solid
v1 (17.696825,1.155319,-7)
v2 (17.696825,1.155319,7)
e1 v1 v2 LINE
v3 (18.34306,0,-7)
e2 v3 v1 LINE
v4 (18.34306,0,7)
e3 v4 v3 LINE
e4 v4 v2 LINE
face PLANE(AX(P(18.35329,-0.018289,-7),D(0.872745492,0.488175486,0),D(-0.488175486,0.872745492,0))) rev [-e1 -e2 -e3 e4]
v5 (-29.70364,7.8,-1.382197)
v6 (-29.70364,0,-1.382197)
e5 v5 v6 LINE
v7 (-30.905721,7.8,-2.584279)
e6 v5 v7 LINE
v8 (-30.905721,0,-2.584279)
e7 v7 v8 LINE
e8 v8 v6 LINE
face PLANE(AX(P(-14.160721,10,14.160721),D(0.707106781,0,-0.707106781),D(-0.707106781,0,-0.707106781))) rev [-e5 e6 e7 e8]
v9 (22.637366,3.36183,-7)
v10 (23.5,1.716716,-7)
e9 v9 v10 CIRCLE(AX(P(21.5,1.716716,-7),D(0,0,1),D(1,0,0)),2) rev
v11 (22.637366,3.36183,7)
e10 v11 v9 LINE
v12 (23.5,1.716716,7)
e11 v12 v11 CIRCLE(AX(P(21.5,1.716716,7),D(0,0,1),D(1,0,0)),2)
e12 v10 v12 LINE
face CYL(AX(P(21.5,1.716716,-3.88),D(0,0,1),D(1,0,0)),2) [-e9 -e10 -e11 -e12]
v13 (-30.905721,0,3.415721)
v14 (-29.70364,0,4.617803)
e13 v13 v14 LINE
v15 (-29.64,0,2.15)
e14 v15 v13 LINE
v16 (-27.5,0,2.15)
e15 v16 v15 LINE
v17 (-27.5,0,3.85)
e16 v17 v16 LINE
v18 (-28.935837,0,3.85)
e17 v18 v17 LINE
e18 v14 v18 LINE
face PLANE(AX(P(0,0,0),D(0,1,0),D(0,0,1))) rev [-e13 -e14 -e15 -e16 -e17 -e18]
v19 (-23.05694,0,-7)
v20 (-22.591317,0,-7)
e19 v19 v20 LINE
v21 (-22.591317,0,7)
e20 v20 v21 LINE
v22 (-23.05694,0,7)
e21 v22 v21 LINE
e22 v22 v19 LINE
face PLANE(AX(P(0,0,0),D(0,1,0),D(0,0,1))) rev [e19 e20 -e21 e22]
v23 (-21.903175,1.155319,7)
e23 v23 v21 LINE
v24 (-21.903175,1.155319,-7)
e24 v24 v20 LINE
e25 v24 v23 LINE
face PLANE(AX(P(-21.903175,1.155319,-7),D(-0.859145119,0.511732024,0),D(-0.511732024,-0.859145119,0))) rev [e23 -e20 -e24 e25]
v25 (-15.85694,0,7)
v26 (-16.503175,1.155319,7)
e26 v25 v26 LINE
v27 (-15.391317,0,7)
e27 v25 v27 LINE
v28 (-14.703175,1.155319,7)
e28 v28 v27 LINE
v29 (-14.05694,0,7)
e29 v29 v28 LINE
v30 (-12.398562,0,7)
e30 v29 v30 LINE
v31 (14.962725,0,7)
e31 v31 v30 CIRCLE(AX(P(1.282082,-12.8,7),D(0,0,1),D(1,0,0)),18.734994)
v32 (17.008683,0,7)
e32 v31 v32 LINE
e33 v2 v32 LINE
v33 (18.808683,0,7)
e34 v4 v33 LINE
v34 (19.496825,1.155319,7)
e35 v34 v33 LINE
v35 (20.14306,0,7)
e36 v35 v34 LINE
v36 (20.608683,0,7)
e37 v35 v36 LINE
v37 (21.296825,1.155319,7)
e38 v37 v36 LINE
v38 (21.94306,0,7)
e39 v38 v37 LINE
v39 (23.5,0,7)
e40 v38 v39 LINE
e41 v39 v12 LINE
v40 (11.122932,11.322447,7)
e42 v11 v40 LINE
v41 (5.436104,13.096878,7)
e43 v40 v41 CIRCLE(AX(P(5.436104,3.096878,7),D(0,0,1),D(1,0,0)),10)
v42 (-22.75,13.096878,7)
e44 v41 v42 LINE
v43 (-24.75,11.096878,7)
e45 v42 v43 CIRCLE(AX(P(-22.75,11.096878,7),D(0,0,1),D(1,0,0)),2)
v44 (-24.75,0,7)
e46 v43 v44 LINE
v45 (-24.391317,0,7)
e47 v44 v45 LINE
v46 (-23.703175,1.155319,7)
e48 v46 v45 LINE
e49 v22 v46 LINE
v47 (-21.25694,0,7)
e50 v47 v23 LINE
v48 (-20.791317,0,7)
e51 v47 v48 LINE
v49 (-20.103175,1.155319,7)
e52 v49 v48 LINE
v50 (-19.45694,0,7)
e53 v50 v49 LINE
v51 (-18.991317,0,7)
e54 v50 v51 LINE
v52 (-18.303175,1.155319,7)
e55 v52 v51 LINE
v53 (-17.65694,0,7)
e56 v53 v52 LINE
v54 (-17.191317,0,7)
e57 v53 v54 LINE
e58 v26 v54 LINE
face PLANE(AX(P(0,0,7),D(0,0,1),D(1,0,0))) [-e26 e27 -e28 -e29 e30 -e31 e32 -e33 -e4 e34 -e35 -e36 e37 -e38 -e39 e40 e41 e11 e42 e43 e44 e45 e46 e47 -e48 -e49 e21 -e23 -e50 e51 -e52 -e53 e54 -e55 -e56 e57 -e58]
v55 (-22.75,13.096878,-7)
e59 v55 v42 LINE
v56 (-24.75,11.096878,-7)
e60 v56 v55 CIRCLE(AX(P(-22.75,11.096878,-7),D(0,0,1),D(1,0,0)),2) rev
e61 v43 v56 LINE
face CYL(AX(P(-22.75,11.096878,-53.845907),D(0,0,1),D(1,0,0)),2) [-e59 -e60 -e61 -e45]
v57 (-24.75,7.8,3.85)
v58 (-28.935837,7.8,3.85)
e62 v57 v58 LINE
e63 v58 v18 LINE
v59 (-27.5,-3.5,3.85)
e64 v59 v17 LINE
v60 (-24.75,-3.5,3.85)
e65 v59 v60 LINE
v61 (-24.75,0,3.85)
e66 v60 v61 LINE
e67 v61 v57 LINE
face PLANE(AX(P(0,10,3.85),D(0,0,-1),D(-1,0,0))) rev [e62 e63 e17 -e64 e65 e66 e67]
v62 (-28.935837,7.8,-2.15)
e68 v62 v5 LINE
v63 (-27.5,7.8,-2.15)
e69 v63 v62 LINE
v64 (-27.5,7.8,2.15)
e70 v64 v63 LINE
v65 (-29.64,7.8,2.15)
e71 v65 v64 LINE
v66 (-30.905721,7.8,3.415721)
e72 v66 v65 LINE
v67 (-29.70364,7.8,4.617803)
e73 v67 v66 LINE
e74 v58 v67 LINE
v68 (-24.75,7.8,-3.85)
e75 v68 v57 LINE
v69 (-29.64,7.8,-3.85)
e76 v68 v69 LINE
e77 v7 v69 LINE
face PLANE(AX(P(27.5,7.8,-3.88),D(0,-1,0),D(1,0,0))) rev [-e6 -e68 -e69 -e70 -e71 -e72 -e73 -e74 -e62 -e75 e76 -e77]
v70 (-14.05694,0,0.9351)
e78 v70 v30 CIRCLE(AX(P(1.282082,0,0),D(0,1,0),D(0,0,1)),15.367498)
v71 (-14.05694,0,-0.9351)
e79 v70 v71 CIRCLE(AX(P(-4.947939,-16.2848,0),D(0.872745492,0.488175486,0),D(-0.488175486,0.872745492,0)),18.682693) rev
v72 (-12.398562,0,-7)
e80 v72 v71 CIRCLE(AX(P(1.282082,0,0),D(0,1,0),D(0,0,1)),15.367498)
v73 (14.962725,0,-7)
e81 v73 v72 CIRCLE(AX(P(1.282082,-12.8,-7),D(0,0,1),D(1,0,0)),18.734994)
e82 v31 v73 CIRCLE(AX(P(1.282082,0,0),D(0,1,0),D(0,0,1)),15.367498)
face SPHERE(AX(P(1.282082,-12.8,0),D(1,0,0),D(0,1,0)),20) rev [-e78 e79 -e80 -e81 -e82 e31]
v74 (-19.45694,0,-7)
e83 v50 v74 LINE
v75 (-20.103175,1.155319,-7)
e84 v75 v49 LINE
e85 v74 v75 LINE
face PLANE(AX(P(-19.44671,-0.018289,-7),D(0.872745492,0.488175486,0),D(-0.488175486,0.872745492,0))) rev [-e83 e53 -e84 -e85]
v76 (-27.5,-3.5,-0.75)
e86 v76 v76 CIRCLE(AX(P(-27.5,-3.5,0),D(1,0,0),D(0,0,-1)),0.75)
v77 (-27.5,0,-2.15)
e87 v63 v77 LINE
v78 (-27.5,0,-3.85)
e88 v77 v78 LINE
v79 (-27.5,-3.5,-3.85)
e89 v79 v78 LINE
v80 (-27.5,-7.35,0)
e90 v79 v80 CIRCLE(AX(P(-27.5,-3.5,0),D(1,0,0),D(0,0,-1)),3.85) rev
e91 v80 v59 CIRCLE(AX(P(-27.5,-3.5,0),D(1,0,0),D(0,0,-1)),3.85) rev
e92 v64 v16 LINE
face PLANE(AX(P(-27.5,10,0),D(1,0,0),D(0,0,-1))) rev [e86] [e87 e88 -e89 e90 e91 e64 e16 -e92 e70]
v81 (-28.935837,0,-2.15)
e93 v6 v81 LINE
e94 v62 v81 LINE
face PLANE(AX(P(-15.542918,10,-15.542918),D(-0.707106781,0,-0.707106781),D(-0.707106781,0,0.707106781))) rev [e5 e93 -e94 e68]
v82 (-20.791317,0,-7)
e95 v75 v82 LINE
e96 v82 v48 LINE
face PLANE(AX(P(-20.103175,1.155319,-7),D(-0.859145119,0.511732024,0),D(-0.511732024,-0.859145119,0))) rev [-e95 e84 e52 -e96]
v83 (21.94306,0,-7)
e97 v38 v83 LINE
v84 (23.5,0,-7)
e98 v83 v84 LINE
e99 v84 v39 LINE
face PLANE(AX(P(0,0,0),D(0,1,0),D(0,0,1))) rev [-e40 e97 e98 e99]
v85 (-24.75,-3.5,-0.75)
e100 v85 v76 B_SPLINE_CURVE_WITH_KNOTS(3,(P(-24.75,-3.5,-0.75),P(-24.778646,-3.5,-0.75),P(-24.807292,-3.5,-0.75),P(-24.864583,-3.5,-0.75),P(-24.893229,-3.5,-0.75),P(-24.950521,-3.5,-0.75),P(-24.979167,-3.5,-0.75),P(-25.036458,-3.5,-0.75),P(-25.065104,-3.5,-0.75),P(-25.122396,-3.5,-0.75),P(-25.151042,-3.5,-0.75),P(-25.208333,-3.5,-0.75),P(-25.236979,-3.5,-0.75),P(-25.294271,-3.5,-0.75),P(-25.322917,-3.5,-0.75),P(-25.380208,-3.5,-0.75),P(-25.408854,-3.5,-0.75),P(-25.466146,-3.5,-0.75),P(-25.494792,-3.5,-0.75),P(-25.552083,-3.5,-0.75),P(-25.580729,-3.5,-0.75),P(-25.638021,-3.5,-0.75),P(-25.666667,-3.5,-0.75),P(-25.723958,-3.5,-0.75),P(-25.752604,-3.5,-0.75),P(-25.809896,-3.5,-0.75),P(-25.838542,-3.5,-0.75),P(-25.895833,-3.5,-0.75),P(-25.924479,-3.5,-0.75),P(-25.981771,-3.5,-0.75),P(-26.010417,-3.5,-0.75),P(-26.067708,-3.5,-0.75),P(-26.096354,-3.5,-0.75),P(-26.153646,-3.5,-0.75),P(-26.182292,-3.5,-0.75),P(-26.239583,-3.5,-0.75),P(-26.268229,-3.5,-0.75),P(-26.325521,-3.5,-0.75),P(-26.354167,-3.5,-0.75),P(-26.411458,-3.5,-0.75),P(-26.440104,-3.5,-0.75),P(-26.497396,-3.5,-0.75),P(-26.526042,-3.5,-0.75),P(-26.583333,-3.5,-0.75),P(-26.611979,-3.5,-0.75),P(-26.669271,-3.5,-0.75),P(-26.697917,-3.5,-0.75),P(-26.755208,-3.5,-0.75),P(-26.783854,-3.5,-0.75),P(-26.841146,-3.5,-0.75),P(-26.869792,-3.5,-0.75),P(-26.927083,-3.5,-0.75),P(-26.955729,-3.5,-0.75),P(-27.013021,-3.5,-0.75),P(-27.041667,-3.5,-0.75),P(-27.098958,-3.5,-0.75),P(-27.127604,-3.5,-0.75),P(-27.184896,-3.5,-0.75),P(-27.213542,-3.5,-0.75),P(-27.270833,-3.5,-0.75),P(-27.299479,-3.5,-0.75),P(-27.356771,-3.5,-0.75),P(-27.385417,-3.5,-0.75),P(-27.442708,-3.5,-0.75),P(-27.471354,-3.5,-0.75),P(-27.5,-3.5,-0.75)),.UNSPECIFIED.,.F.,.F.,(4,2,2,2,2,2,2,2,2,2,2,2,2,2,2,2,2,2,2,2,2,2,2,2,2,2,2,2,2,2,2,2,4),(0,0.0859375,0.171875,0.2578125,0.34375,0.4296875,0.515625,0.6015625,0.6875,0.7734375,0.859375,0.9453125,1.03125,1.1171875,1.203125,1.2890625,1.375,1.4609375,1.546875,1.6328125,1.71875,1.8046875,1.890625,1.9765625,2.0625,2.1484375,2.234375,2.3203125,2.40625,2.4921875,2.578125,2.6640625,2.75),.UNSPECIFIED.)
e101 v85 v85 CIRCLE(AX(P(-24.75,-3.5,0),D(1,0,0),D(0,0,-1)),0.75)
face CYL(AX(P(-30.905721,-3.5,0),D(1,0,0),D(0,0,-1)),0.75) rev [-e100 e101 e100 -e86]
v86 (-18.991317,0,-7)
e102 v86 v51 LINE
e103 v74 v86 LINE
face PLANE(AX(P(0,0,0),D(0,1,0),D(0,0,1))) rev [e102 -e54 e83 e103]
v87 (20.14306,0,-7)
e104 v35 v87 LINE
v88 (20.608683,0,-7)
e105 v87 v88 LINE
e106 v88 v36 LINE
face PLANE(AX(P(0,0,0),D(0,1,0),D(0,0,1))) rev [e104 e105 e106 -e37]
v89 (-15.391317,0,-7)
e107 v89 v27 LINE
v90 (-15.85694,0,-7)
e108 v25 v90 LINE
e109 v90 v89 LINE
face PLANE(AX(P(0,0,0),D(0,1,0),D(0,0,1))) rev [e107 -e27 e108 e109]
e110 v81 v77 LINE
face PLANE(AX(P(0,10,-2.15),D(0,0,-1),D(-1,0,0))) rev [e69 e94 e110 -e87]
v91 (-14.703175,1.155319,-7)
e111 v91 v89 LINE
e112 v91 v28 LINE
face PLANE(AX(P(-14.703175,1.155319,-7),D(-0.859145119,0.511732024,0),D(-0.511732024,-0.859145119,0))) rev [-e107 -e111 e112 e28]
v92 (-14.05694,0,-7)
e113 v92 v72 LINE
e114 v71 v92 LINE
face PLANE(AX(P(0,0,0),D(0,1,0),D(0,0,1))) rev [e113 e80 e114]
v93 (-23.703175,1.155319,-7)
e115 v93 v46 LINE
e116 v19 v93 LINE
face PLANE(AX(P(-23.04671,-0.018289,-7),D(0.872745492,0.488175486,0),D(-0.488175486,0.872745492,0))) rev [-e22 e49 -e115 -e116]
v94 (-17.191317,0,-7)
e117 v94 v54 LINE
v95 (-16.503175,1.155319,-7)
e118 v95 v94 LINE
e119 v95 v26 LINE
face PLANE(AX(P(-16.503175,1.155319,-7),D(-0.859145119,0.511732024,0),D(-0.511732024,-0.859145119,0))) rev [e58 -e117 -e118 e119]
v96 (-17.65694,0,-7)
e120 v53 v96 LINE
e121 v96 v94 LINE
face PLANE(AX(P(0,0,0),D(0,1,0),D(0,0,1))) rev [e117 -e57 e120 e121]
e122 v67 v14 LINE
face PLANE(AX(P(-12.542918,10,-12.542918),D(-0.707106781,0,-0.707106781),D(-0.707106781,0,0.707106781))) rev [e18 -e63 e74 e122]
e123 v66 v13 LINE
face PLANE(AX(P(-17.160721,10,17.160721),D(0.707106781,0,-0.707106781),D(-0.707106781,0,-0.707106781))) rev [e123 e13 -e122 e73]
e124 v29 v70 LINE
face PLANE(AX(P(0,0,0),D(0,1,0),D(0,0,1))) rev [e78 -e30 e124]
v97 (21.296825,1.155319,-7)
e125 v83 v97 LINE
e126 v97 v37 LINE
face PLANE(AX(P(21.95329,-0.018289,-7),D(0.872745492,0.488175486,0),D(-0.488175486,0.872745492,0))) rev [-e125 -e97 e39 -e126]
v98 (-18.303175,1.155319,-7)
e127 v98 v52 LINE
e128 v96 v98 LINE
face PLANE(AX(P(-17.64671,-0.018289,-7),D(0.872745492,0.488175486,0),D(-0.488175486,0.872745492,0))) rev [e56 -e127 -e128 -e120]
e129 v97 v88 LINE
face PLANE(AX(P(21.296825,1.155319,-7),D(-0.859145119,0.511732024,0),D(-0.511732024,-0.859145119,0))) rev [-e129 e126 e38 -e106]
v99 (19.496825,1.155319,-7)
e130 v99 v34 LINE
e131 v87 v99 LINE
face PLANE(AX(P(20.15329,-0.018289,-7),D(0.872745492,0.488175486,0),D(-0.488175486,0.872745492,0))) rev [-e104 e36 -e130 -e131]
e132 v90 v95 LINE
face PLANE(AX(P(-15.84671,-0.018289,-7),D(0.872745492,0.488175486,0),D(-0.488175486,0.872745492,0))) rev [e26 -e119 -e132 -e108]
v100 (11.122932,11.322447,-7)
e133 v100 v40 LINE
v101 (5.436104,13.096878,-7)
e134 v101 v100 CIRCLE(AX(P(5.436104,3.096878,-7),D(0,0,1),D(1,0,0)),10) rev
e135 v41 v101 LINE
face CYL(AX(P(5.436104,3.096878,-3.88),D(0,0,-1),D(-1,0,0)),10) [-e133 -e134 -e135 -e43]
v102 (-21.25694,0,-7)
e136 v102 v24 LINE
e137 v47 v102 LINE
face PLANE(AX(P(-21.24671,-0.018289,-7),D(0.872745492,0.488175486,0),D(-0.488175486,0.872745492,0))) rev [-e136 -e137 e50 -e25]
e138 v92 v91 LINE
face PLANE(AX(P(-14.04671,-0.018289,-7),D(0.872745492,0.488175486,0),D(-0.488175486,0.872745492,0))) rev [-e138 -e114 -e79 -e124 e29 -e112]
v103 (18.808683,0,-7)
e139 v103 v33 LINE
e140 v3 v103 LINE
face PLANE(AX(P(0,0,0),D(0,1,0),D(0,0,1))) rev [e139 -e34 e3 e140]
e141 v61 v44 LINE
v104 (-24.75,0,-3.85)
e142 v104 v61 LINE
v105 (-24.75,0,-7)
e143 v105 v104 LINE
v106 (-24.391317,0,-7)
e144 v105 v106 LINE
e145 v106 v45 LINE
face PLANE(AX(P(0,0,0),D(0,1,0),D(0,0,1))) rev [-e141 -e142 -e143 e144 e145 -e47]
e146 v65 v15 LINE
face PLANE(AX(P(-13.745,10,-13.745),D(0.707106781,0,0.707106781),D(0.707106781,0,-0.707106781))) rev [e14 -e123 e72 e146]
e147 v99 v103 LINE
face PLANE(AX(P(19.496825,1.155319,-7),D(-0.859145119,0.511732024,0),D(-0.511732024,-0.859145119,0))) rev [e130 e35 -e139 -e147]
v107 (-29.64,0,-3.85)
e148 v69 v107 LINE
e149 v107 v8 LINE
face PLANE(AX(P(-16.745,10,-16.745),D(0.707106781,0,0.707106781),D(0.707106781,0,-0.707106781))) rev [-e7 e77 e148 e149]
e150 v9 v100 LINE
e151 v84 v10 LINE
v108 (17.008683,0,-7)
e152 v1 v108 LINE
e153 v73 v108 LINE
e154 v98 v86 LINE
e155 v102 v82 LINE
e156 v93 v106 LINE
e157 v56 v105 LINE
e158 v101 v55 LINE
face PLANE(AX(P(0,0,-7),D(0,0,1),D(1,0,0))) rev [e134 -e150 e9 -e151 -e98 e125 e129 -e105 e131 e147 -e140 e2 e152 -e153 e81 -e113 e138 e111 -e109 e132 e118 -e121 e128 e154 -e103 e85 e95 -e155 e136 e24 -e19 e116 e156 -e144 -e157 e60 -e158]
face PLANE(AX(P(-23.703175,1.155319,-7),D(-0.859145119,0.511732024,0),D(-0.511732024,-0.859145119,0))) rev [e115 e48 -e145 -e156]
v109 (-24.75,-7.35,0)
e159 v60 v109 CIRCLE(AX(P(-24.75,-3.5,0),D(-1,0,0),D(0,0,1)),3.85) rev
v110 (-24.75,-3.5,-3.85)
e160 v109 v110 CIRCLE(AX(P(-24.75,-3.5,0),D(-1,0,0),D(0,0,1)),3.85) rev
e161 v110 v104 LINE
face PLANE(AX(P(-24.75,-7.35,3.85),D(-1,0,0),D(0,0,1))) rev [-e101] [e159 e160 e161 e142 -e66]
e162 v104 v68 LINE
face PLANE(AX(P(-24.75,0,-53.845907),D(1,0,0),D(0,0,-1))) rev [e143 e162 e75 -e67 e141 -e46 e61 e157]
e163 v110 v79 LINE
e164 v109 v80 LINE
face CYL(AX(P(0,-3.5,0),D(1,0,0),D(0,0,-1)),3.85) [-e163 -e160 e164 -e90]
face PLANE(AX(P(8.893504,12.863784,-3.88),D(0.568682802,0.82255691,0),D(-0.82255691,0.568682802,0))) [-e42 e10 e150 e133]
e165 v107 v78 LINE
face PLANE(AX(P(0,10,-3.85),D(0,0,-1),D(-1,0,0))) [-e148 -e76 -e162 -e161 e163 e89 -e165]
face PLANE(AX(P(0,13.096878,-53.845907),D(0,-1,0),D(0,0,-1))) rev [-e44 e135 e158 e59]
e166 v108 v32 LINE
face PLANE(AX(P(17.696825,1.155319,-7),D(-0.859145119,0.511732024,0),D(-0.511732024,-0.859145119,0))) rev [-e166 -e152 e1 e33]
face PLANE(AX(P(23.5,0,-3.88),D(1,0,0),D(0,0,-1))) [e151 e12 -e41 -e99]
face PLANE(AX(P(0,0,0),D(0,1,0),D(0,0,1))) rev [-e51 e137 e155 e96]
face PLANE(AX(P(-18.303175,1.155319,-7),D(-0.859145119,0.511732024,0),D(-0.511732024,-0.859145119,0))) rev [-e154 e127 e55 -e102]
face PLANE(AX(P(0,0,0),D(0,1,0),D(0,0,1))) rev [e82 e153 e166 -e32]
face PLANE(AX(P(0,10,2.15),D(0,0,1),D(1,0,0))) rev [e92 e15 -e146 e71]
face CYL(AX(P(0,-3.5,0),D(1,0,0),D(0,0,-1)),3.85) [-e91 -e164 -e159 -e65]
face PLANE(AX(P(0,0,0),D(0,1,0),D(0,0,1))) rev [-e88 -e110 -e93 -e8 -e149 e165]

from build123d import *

# Parameters (mm, degrees)
EXTRUDE_1_DEPTH              = 10
CUT_EXTRUDE_1_DEPTH          = 34.383433003
FILLET_1_SIZE                = 4
FILLET_1_SIZE_2              = 6
CUT_EXTRUDE_2_DEPTH          = 34.383433056
CUT_EXTRUDE_2_DEPTH_BACK     = 34.383433056
SKETCH_3_W                   = 58.405721138
SKETCH_3_H                   = 2.2
SKETCH_4_W                   = 2.75
SKETCH_4_H                   = 7.7
EXTRUDE_2_DEPTH              = 7.35
SKETCH_5_R                   = 0.75
CUT_EXTRUDE_3_DEPTH          = 54.030431013
FILLET_2_R                   = 3.85
CORTAR_EXTRUIR1_DEPTH        = 33.791669707
SALIENTE_EXTRUIR1_DEPTH      = 7.7
CROQUIS2_R                   = 20
CORTAR_EXTRUIR3_DEPTH        = 35.438086687
SALIENTE_EXTRUIR4_DEPTH      = 7
SALIENTE_EXTRUIR4_DEPTH_BACK = 7
CORTAR_EXTRUIR4_DEPTH        = 37.368830262
REDONDEO3_R                  = 2
REDONDEO4_R                  = 10


# Some blends are built 0.0001 mm under size
with BuildPart() as part:
    # 草图1 → 凸台-拉伸1 (new body)
    with BuildSketch(Plane(origin=(0, 0, 0), x_dir=(1, 0, 0), z_dir=(0, 1, 0))):
        Polygon((27.5, 3.85), (-27.5, 3.85), (-29.64, 3.85), (-30.905721138, 2.584278862), (-29.70363961, 1.382197334), (-28.935836944, 2.15), (-27.5, 2.15), (-27.5, -2.15), (-29.64, -2.15), (-30.905721138, -3.415721138), (-29.70363961, -4.617802666), (-28.935836944, -3.85), (-27.5, -3.85), (27.5, -3.85), align=None)
    extrude(amount=EXTRUDE_1_DEPTH)

    # 草图2 → 切除-拉伸1 (cut, through all)
    with BuildSketch(Plane.XY.offset(3.85)):
        with BuildLine():
            Line((-18.935836944, 0), (21.5, 0))
            ThreePointArc((21.5, 0), (1.282081528, 3.70613757), (-18.935836944, 0))
        make_face()
    extrude(amount=-CUT_EXTRUDE_1_DEPTH, mode=Mode.SUBTRACT)

    # 圆角1
    # an asymmetric fillet: 6, 4 mm, written as the material it takes off along each edge
    with BuildSketch(Plane(origin=(27.5, 0, 18.85), x_dir=(-1, 0, 0), z_dir=(0, 0, -1))) as fillet_1_piece_1:
        with BuildLine():
            Bezier((FILLET_1_SIZE, 0), (0, 0), (0, FILLET_1_SIZE_2), weights=[1, 0.707106781, 1])
            Line((0, FILLET_1_SIZE_2), (0, 0))
            Line((0, 0), (FILLET_1_SIZE, 0))
        make_face()
    extrude(amount=37.7, mode=Mode.SUBTRACT)

    # 草图3 → 切除-拉伸2 (cut, two sides: drawn at the far end of the back side and taken through both)
    with BuildSketch(Plane.XY.offset(3.85).offset(-CUT_EXTRUDE_2_DEPTH_BACK)):
        with Locations((-1.702860569, 8.9)):
            Rectangle(SKETCH_3_W, SKETCH_3_H)
    extrude(amount=CUT_EXTRUDE_2_DEPTH + CUT_EXTRUDE_2_DEPTH_BACK, mode=Mode.SUBTRACT)

    # 草图4 → 凸台-拉伸2 (add)
    with BuildSketch(Plane.XZ):
        with Locations((-26.125, 0)):
            Rectangle(SKETCH_4_W, SKETCH_4_H)
    extrude(amount=EXTRUDE_2_DEPTH)

    # 草图5 → 切除-拉伸3 (cut, through all)
    with BuildSketch(Plane(origin=(-24.75, 0, 0), x_dir=(0, 0, -1), z_dir=(1, 0, 0))):
        with Locations((0, -3.5)):
            Circle(SKETCH_5_R)
    extrude(amount=-CUT_EXTRUDE_3_DEPTH, mode=Mode.SUBTRACT)

    # 圆角2
    fillet_2_edges = [part.edges().sort_by_distance(p)[0] for p in [
        (-26.125, -7.35, -3.85),
        (-26.125, -7.35, 3.85),
    ]]
    fillet(fillet_2_edges, radius=FILLET_2_R - 0.0001)  # a hair under: the kernel refuses the full size

    # Croquis1 → Cortar-Extruir1 (cut, through all)
    with BuildSketch(Plane.XY.offset(3.85)):
        with BuildLine():
            Line((27.5, 7.8), (16.217886534, 7.8))
            Line((16.217886534, 7.8), (23.5, 2.765439303))
            Line((23.5, 2.765439303), (23.5, 0))
            add(Edge.make_bspline(
                [(27.5, 6), (27.5, 5.69042848), (27.487576866, 5.380787378), (27.462721246, 5.071641684), (27.425314756, 4.763619555), (27.375158046, 4.457411018), (27.311958659, 4.153772273), (27.15893131, 3.554601129), (27.069254161, 3.259173226), (26.965810638, 2.96797603), (26.848060748, 2.682057947), (26.71538748, 2.402788295), (26.567124674, 2.131846167), (26.305522028, 1.71806679), (26.202980384, 1.568477856), (26.094611251, 1.422961788), (25.980267973, 1.282053299), (25.859832084, 1.146386576), (25.733223411, 1.016687557), (25.50418613, 0.80470891), (25.40471615, 0.719219867), (25.301997411, 0.637611459), (25.196057574, 0.56023543), (25.086963249, 0.487470604), (24.97482846, 0.419710585), (24.681074838, 0.260429148), (24.49523869, 0.176468902), (24.303178892, 0.107130148), (24.106026723, 0.053886894), (23.905206432, 0.017937167), (23.702478464, 0), (23.5, 0)],
                knots=[0, 0, 0, 0, 0, 0, 0, 0, 0.272858712, 0.272858712, 0.272858712, 0.272858712, 0.272858712, 0.272858712, 0.544533939, 0.544533939, 0.544533939, 0.544533939, 0.544533939, 0.544533939, 0.704314184, 0.704314184, 0.704314184, 0.704314184, 0.704314184, 0.704314184, 0.820075996, 0.820075996, 0.820075996, 0.820075996, 0.820075996, 0.820075996, 1, 1, 1, 1, 1, 1, 1, 1], degree=7))
            Line((27.5, 6), (27.5, 7.8))
        make_face()
    extrude(amount=-CORTAR_EXTRUIR1_DEPTH, mode=Mode.SUBTRACT)

    # Croquis1<3> → Saliente-Extruir1 (add)
    with BuildSketch(Plane.XY.offset(3.85)):
        Polygon((-24.75, 13.096878085), (-24.75, 7.8), (16.217886534, 7.8), (8.556350692, 13.096878085), align=None)
        with BuildLine():
            ThreePointArc((21.5, 0), (1.282081528, 3.70613757), (-18.935836944, 0))
            Line((-18.935836944, 0), (21.5, 0))
        make_face()
        with BuildLine():
            Line((-24.75, 7.8), (-24.75, 0))
            Line((-24.75, 0), (-18.935836944, 0))
            ThreePointArc((-18.935836944, 0), (1.282081528, 3.70613757), (21.5, 0))
            Line((21.5, 0), (23.5, 0))
            Line((23.5, 0), (23.5, 2.765439303))
            Line((23.5, 2.765439303), (16.217886534, 7.8))
            Line((16.217886534, 7.8), (-24.75, 7.8))
        make_face()
    extrude(amount=-SALIENTE_EXTRUIR1_DEPTH)

    # Croquis2 → Cortar-Extruir3 (cut, through all)
    with BuildSketch(Plane.XY.offset(3.85)):
        with Locations((1.282081528, -12.8)):
            Circle(CROQUIS2_R)
    extrude(amount=-CORTAR_EXTRUIR3_DEPTH, mode=Mode.SUBTRACT)

    # Croquis3 → Saliente-Extruir4 (add, two sides: drawn at the far end of the back side and taken through both)
    with BuildSketch(Plane.XY.offset(-SALIENTE_EXTRUIR4_DEPTH_BACK)):
        with BuildLine():
            ThreePointArc((16.649579698, 0), (1.282081528, 7.2), (-14.085416642, 0))
            Line((-14.085416642, 0), (-24.75, 0))
            Line((-24.75, 0), (-24.75, 7.8))
            Line((-24.75, 7.8), (-24.75, 13.096878085))
            Line((-24.75, 13.096878085), (8.556350692, 13.096878085))
            Line((8.556350692, 13.096878085), (23.5, 2.765439303))
            Line((23.5, 2.765439303), (23.5, 0))
            Line((23.5, 0), (16.649579698, 0))
        make_face()
        with BuildLine():
            Line((16.649579698, 0), (-14.085416642, 0))
            ThreePointArc((-14.085416642, 0), (1.282081528, 7.2), (16.649579698, 0))
        make_face()
    extrude(amount=SALIENTE_EXTRUIR4_DEPTH + SALIENTE_EXTRUIR4_DEPTH_BACK)

    # Croquis4 → Cortar-Revolución2 (revolve, cut)
    with BuildSketch(Plane.XY):
        with BuildLine():
            ThreePointArc((14.588399238, 2.131239365), (1.282081528, 7.2), (-12.024236182, 2.131239365))
            ThreePointArc((-12.024236182, 2.131239365), (1.282081528, 3.70613757), (14.588399238, 2.131239365))
        make_face()
        with BuildLine():
            ThreePointArc((-12.024236182, 2.131239365), (-13.094374036, 1.103867282), (-14.085416642, 0))
            Line((-14.085416642, 0), (16.649579698, 0))
            ThreePointArc((16.649579698, 0), (15.658537092, 1.103867282), (14.588399238, 2.131239365))
            ThreePointArc((14.588399238, 2.131239365), (1.282081528, 3.70613757), (-12.024236182, 2.131239365))
        make_face()
    revolve(axis=Axis((1.282081528, -12.8, 0), (-1, 0, 0)), mode=Mode.SUBTRACT)

    # Croquis5 → Cortar-Extruir4 (cut, through all)
    with BuildSketch(Plane.XY.offset(7)):
        Polygon((-22.59131667, 0), (-21.246710257, -0.018288841), (-21.903174863, 1.155318891), align=None)
        Polygon((-24.39131667, 0), (-23.046710257, -0.018288841), (-23.703174863, 1.155318891), align=None)
        Polygon((-20.79131667, 0), (-19.446710257, -0.018288841), (-20.103174863, 1.155318891), align=None)
        Polygon((-18.99131667, 0), (-17.646710257, -0.018288841), (-18.303174863, 1.155318891), align=None)
        Polygon((-17.19131667, 0), (-15.846710257, -0.018288841), (-16.503174863, 1.155318891), align=None)
        Polygon((-15.39131667, 0), (-14.046710257, -0.018288841), (-14.703174863, 1.155318891), align=None)
        Polygon((17.00868333, 0), (18.353289743, -0.018288841), (17.696825137, 1.155318891), align=None)
        Polygon((18.80868333, 0), (20.153289743, -0.018288841), (19.496825137, 1.155318891), align=None)
        Polygon((20.60868333, 0), (21.953289743, -0.018288841), (21.296825137, 1.155318891), align=None)
    extrude(amount=-CORTAR_EXTRUIR4_DEPTH, mode=Mode.SUBTRACT)

    # Redondeo3
    redondeo3_edges = [part.edges().sort_by_distance(p)[0] for p in [
        (23.5, 2.765439303, 0),
        (-24.75, 13.096878085, 0),
    ]]
    fillet(redondeo3_edges, radius=REDONDEO3_R)

    # Redondeo4
    redondeo4_edges = [part.edges().sort_by_distance(p)[0] for p in [
        (8.556350692, 13.096878085, 0),
    ]]
    fillet(redondeo4_edges, radius=REDONDEO4_R)


solid = part.part
